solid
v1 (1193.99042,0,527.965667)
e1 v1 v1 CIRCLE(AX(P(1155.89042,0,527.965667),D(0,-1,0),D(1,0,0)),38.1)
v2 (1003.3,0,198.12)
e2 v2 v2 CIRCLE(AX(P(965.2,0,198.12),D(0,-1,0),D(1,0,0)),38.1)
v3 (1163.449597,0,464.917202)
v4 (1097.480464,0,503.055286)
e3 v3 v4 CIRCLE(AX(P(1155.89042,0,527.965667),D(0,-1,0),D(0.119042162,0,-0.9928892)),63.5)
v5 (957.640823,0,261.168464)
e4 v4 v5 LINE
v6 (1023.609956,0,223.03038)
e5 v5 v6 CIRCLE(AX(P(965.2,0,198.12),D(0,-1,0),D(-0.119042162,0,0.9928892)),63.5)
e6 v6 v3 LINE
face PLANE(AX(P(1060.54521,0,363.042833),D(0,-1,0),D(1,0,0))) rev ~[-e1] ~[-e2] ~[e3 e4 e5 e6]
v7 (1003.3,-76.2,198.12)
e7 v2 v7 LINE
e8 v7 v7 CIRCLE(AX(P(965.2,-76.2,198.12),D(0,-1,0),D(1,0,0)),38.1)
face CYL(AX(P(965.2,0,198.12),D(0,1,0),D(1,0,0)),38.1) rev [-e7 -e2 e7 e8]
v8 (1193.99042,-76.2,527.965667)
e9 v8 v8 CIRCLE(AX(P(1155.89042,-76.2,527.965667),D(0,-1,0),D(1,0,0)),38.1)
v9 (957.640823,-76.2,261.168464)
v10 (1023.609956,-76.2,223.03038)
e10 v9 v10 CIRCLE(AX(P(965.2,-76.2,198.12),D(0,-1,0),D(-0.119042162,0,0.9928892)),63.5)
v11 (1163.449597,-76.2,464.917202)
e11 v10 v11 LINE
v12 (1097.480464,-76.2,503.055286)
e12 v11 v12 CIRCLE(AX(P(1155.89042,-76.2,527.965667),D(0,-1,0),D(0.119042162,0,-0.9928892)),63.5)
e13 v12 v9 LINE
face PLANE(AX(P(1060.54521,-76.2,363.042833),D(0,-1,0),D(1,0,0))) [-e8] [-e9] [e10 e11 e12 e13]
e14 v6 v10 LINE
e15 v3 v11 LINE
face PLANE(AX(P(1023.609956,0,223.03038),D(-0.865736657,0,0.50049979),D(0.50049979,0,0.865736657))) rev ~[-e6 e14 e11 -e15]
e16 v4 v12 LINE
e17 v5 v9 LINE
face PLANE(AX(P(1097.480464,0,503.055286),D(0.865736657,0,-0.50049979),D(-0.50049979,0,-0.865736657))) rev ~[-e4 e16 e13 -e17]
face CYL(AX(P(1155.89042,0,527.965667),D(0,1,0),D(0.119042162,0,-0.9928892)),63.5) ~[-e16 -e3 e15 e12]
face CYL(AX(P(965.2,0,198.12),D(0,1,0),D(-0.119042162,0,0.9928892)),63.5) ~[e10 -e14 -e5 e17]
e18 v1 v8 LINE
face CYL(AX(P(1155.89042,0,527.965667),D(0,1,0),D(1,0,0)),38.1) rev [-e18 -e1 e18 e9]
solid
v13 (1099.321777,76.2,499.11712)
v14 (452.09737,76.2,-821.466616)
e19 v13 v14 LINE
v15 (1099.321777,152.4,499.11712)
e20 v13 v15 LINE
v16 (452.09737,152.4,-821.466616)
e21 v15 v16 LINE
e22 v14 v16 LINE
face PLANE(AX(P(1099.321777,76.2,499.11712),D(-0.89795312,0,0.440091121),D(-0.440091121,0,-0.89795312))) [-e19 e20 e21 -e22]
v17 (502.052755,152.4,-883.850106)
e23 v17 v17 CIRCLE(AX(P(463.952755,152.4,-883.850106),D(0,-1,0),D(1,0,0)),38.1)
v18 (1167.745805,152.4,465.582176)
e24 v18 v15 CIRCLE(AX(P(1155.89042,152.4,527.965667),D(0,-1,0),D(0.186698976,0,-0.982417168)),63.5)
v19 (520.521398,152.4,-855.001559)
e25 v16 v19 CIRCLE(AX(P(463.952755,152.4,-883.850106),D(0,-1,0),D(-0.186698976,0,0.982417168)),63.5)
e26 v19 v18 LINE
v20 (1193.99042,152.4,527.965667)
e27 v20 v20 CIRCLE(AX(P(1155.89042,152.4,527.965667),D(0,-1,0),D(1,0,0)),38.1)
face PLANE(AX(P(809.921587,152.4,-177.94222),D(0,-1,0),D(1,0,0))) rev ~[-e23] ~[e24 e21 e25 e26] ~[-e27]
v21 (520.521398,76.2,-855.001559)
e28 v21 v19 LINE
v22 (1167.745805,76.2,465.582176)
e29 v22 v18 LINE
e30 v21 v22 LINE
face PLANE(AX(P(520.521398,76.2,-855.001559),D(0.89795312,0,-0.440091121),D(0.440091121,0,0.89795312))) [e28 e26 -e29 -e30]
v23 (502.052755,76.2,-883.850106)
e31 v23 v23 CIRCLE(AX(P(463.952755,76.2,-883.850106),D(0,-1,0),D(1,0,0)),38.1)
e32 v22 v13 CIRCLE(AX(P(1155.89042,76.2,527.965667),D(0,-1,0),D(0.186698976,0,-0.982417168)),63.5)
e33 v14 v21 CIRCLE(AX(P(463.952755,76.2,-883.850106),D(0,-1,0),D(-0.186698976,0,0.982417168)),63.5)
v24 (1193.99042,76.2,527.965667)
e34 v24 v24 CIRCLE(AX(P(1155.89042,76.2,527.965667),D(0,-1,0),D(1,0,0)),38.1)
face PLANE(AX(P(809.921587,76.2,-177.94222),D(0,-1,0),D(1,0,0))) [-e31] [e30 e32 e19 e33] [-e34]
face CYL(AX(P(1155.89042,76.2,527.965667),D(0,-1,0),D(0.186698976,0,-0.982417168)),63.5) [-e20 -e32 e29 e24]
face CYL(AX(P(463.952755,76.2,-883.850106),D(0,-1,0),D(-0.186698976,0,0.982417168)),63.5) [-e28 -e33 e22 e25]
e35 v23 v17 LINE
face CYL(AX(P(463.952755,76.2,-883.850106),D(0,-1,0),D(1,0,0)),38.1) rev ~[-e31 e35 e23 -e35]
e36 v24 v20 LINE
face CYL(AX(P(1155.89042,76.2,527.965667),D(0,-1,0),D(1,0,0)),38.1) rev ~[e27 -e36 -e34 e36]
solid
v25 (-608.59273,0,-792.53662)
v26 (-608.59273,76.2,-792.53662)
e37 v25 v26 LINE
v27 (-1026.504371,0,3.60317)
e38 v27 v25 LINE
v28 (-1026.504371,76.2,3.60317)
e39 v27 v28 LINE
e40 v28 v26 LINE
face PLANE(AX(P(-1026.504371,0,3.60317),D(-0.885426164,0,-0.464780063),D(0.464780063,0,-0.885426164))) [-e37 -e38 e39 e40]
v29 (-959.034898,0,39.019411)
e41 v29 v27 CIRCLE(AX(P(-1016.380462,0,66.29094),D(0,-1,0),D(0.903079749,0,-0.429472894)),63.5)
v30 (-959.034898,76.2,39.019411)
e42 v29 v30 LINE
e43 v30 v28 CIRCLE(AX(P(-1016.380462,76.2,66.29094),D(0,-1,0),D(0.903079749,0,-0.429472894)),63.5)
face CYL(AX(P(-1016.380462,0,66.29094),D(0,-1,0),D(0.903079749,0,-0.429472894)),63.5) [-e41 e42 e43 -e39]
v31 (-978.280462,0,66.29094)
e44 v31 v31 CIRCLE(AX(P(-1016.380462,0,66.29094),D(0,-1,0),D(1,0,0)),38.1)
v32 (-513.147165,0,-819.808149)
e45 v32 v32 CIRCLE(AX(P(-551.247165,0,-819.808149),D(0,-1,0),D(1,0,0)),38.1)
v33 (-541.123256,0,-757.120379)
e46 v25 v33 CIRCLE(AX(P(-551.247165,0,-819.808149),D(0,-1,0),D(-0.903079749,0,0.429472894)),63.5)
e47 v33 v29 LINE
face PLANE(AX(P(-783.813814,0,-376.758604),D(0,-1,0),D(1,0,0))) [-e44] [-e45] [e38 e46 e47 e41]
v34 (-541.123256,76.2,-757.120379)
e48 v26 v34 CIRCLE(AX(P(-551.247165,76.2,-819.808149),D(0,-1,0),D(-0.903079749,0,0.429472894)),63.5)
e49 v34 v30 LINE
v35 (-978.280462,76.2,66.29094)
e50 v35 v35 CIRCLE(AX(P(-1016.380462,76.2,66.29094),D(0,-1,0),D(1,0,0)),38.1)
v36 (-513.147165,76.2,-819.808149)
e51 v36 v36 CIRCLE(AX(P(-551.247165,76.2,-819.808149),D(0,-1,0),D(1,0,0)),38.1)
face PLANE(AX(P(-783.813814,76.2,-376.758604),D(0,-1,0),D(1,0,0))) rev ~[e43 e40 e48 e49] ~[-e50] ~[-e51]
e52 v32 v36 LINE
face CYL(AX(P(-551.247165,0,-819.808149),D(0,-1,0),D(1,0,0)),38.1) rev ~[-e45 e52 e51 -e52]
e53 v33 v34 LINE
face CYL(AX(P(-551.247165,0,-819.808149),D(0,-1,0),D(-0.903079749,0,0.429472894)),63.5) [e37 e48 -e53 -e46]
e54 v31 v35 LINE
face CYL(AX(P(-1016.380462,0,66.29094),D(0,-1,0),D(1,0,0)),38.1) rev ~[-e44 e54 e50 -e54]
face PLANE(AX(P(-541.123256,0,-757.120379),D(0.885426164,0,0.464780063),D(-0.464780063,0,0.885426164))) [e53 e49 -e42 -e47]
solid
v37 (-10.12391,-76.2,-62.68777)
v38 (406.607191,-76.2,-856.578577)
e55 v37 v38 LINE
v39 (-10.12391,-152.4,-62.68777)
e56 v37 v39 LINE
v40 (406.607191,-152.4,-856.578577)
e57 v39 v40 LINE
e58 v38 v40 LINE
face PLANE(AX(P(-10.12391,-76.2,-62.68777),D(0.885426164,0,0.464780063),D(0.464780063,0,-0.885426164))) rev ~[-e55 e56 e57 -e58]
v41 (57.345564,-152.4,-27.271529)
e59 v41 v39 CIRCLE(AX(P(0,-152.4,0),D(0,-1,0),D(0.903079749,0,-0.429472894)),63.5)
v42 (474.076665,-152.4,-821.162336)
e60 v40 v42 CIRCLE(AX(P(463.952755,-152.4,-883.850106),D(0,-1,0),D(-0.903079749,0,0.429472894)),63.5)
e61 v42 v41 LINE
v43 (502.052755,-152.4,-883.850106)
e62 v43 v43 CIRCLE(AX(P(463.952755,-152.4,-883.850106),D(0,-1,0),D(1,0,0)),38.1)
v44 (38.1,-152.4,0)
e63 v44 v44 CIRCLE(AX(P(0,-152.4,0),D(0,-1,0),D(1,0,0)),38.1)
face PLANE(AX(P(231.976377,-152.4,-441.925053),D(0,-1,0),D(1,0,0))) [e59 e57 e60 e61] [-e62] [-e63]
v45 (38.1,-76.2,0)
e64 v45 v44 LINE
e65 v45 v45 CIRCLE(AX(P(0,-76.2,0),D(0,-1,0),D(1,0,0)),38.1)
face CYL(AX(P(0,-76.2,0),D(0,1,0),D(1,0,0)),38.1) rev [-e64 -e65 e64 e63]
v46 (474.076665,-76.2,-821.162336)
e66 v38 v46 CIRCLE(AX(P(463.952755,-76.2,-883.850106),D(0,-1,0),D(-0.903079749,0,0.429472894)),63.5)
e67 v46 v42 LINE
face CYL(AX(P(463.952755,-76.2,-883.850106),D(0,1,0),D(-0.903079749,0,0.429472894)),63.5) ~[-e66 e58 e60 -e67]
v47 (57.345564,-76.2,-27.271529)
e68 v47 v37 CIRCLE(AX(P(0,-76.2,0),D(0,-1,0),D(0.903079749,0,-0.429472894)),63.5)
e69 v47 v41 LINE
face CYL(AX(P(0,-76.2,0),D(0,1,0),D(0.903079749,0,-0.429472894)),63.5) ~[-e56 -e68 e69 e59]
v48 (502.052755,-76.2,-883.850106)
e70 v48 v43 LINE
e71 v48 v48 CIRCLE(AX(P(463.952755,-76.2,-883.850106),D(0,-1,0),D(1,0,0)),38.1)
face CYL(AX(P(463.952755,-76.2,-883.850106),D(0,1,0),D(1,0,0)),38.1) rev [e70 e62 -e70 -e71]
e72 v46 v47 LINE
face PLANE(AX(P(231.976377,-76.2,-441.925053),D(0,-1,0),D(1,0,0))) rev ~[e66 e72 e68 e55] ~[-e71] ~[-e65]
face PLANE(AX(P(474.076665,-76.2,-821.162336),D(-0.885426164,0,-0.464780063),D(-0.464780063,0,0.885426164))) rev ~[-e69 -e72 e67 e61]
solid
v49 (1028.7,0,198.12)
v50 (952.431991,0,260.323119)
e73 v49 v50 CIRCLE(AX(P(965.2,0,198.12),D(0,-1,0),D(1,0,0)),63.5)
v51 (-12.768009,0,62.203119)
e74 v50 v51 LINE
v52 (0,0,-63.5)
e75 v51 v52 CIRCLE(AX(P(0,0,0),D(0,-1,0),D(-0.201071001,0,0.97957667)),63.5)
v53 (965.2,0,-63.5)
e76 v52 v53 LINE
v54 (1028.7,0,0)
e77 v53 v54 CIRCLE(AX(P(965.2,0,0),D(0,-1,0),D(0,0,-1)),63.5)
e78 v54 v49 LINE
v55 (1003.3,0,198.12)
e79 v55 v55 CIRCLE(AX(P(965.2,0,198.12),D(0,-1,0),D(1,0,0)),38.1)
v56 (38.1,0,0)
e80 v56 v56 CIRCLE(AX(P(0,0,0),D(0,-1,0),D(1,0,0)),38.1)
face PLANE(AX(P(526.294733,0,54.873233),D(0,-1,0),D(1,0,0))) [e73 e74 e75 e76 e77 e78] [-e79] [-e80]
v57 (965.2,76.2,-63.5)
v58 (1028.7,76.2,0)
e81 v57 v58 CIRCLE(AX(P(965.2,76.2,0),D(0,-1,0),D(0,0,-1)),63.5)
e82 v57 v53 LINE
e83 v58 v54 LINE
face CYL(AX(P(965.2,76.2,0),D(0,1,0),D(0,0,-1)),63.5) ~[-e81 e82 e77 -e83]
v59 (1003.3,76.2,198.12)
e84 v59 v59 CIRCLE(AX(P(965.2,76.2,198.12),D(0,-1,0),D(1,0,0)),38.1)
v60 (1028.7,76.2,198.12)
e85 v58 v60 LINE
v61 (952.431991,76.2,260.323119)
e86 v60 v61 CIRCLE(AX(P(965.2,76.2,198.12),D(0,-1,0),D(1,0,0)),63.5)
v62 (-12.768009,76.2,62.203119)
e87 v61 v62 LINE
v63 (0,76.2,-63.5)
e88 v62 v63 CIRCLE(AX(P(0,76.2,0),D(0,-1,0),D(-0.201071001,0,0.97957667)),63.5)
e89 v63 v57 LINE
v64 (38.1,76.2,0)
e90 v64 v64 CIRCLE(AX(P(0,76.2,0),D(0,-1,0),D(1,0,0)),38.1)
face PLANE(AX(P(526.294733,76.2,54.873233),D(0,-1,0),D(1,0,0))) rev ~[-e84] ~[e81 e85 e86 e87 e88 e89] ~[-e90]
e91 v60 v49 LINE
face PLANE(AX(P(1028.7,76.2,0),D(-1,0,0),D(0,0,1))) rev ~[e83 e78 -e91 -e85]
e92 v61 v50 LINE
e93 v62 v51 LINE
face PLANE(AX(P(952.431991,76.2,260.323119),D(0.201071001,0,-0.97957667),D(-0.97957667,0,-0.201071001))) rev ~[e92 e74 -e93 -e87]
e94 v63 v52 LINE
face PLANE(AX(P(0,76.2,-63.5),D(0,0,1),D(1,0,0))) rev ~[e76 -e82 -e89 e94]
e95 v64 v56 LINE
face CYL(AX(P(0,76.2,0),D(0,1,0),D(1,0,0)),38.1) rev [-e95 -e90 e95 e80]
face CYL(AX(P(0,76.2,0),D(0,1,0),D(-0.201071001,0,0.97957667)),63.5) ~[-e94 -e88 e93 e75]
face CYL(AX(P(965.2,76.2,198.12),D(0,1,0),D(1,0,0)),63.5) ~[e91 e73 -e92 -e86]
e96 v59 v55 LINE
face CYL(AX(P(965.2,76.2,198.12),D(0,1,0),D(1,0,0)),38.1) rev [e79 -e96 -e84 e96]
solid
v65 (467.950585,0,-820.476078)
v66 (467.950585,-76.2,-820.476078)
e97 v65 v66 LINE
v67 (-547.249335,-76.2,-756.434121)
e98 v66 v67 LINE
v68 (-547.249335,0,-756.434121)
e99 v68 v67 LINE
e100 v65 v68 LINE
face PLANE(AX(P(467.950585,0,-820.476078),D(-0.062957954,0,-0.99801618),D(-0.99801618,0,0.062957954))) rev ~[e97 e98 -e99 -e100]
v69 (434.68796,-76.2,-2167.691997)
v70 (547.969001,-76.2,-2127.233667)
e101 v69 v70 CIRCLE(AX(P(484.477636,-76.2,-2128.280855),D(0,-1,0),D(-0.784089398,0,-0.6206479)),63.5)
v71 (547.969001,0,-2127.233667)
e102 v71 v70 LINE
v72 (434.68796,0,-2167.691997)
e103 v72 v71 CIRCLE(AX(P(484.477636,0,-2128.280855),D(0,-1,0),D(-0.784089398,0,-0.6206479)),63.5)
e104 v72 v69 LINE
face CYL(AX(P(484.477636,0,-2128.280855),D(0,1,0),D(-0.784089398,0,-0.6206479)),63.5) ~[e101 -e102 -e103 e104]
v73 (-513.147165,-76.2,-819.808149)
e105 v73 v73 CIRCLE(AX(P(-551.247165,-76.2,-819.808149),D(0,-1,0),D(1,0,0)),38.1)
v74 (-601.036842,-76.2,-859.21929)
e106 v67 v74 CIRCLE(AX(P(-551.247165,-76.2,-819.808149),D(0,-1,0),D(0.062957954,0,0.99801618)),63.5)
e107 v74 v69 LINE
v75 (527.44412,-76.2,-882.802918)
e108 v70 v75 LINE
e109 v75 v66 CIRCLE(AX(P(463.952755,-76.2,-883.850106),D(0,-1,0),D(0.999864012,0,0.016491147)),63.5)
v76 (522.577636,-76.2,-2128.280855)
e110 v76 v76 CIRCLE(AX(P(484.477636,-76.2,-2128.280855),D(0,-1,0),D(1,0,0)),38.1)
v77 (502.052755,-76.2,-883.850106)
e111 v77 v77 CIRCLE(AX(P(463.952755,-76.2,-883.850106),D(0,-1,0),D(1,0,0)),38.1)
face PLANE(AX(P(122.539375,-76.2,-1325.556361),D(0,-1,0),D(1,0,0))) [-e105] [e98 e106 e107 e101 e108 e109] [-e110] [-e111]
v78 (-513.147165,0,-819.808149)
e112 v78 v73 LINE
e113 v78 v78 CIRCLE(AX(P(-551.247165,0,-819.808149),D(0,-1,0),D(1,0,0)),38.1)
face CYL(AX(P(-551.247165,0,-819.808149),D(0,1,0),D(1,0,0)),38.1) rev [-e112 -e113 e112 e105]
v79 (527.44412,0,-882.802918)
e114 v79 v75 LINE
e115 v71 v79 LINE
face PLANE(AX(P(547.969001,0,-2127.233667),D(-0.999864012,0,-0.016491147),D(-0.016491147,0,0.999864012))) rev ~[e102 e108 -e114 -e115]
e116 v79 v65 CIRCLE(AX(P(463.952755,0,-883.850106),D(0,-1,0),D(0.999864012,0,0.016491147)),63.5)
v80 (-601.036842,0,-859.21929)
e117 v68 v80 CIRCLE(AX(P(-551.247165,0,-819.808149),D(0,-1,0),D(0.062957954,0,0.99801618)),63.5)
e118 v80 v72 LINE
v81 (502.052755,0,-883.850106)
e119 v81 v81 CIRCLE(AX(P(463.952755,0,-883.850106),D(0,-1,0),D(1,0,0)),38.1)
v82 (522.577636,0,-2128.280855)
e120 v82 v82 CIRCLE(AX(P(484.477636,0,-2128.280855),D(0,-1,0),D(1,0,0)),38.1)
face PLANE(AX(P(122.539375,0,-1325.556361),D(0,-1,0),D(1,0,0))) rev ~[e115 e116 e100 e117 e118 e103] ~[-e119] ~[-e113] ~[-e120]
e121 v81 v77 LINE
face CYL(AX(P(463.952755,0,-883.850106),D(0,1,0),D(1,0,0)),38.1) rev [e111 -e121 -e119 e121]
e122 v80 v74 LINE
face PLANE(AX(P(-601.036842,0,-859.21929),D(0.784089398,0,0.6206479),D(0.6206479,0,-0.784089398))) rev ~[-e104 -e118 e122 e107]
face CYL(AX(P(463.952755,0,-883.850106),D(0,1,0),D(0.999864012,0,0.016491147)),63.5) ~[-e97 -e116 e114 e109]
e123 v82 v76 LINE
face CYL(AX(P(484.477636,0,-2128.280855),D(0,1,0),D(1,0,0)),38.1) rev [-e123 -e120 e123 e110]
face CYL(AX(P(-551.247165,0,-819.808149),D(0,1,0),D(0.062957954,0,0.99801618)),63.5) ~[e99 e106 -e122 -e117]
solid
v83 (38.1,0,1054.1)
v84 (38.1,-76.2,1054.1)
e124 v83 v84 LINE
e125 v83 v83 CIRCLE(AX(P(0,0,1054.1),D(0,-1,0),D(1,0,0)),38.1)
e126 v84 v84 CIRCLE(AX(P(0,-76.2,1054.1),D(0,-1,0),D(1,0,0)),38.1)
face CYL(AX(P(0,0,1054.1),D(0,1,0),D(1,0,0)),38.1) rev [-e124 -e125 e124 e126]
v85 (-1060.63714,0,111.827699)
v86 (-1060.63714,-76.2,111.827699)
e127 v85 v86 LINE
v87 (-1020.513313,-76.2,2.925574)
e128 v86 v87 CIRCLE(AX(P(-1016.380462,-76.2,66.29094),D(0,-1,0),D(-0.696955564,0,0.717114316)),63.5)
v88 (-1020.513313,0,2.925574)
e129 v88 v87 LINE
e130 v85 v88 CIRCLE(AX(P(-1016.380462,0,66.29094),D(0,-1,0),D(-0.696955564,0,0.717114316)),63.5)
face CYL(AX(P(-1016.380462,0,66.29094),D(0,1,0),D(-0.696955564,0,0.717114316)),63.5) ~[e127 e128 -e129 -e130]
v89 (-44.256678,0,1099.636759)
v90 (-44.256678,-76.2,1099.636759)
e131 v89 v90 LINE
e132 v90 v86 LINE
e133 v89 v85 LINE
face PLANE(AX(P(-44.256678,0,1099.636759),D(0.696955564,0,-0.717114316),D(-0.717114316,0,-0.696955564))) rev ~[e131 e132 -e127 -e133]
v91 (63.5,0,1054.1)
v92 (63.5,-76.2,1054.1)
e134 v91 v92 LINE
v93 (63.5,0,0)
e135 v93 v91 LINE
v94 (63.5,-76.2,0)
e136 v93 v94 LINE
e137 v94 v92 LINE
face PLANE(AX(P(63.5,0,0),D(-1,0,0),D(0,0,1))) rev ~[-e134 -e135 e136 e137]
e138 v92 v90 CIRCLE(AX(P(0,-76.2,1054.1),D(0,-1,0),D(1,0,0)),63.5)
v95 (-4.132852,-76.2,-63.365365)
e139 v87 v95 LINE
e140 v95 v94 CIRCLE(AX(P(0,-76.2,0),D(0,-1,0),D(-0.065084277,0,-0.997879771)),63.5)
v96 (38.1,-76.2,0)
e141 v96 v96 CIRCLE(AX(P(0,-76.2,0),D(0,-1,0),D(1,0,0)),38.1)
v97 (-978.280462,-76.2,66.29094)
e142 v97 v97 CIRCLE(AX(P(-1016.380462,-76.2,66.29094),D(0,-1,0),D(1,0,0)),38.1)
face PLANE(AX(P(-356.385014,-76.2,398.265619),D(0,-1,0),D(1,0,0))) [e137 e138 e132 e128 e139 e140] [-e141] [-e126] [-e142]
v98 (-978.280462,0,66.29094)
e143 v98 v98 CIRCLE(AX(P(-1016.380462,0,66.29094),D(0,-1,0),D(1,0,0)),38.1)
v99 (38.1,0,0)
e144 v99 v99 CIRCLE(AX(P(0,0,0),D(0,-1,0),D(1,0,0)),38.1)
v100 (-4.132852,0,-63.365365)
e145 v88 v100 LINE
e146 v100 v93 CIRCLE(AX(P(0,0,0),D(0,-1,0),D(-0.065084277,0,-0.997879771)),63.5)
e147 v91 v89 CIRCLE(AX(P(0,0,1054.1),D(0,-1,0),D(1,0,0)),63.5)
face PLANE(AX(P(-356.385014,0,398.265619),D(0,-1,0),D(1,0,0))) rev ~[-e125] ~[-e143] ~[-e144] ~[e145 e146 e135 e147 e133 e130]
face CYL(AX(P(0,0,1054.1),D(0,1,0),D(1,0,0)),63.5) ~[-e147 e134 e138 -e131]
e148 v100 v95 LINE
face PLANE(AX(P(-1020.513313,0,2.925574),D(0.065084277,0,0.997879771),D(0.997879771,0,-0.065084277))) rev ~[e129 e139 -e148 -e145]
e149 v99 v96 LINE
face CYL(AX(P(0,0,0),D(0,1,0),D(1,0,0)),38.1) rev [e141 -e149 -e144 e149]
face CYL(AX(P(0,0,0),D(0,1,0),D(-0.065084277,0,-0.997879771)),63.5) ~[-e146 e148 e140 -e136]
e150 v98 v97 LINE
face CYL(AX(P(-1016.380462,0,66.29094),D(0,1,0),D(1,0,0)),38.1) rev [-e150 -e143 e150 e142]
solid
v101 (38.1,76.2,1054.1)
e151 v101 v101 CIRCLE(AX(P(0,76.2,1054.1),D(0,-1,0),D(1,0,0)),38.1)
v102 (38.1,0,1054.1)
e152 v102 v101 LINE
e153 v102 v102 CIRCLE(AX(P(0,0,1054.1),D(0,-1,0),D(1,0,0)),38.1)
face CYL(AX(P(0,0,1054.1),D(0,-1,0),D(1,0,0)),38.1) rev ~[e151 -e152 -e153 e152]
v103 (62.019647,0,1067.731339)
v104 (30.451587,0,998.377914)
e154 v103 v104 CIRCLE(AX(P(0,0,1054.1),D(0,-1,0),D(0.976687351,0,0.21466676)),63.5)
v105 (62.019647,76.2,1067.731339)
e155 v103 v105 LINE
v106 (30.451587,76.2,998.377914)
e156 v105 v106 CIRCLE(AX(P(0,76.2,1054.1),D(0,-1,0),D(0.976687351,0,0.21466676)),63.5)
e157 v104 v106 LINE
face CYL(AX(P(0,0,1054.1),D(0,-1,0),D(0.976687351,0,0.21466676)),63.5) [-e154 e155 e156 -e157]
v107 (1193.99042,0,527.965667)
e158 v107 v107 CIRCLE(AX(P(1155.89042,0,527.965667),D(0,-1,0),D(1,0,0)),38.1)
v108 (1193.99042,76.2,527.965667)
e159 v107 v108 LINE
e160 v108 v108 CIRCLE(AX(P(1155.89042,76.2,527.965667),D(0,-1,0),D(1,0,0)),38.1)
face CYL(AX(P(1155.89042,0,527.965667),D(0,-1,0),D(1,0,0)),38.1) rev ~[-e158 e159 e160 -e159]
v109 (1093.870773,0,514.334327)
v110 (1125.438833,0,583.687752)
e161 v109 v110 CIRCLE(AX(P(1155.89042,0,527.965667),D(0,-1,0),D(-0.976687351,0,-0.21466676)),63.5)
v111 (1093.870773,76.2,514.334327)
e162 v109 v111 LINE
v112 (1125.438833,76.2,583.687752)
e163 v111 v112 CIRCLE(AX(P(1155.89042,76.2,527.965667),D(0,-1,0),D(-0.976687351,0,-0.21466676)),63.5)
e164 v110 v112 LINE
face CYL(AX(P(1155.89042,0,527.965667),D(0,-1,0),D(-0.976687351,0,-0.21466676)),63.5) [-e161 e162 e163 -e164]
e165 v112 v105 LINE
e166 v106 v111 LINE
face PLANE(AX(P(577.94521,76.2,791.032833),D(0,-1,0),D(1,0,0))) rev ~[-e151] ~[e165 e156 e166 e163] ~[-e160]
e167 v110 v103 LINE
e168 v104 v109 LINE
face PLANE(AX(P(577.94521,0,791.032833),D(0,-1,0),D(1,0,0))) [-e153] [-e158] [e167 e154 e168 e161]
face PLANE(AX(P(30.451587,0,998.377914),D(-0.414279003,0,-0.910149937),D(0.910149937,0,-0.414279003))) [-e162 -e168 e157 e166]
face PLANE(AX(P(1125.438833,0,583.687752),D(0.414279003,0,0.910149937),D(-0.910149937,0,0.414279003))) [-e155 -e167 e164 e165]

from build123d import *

# Parameters (mm, degrees)
F4_R      = 38.1
F5_DEPTH  = 76.2
F7_R      = 38.1
F8_DEPTH  = 76.2
F6_R      = 38.1
F9_DEPTH  = 76.2
F10_R     = 38.1
F11_DEPTH = 76.2
F13_R     = 38.1
F16_DEPTH = 76.2
F15_R     = 38.1
F17_DEPTH = 76.2
F14_R     = 38.1
F18_DEPTH = 76.2
F12_R     = 38.1
F19_DEPTH = 76.2


# Not quite as in the source:
# - a variable given as a bare number and used for a length is read in inches; the dataset says mm whatever the document's units were


with BuildPart() as f5:
    # F4 (on Front) → F5 (new body)
    with BuildSketch(Plane.XZ):
        with BuildLine():
            Line((-44.2566783262, 1099.6367590363), (-1060.6371400165, 111.8276987953))
            ThreePointArc((-1060.6371400165, 111.8276987953), (-1075.9648961572, 44.3376901303), (-1020.5133132963, 2.925574317))
            Line((-1020.5133132963, 2.925574317), (-4.1328516059, -63.365365442))
            ThreePointArc((-4.1328516059, -63.365365442), (43.4155152165, -46.3394328676), (63.5, 0))
            Line((63.5, 0), (63.5, 1054.1))
            ThreePointArc((63.5, 1054.1), (24.7179178561, 1112.591662114), (-44.2566783262, 1099.6367590363))
        make_face()
        with Locations((-1016.3804616903, 66.290939759)):
            Circle(F4_R, mode=Mode.SUBTRACT)
        Circle(F4_R, mode=Mode.SUBTRACT)
        with Locations((0, 1054.1)):
            Circle(F4_R, mode=Mode.SUBTRACT)
    extrude(amount=F5_DEPTH)


with BuildPart() as f8:
    # F7 (on offset) → F8 (new body)
    with BuildSketch(Plane.XZ.offset(-76.2)):
        with BuildLine():
            Line((952.4319914548, 260.3231185536), (-12.7680085452, 62.2031185536))
            ThreePointArc((-12.7680085452, 62.2031185536), (-63.1749476777, -6.4168517144), (0, -63.5))
            Line((0, -63.5), (965.2, -63.5))
            ThreePointArc((965.2, -63.5), (1010.1012806053, -44.9012806053), (1028.7, 0))
            Line((1028.7, 0), (1028.7, 198.12))
            ThreePointArc((1028.7, 198.12), (1005.3340345429, 247.3288332651), (952.4319914548, 260.3231185536))
        make_face()
        Circle(F7_R, mode=Mode.SUBTRACT)
        with Locations((965.2, 198.12)):
            Circle(F7_R, mode=Mode.SUBTRACT)
    extrude(amount=F8_DEPTH)


with BuildPart() as f9:
    # F6 (on Front) → F9 (new body)
    with BuildSketch(Plane.XZ):
        with BuildLine():
            Line((-541.1232558193, -757.1203790043), (-959.0348976054, 39.0194110198))
            ThreePointArc((-959.0348976054, 39.0194110198), (-1045.8939957148, 122.5155012014), (-1026.5043713362, 3.6031701905))
            Line((-1026.5043713362, 3.6031701905), (-608.5927295501, -792.5366198337))
            ThreePointArc((-608.5927295501, -792.5366198337), (-521.7336314407, -876.0327100153), (-541.1232558193, -757.1203790043))
        make_face()
        with Locations((-551.2471654652, -819.8081485729)):
            Circle(F6_R, mode=Mode.SUBTRACT)
        with Locations((-1016.3804616903, 66.290939759)):
            Circle(F6_R, mode=Mode.SUBTRACT)
    extrude(amount=-F9_DEPTH)


with BuildPart() as f11:
    # F10 (on Front) → F11 (new body)
    with BuildSketch(Plane.XZ):
        with BuildLine():
            Line((1125.4388332322, 583.6877524417), (62.0196468061, 1067.7313392609))
            ThreePointArc((62.0196468061, 1067.7313392609), (-57.7945210014, 1080.406716675), (30.4515867962, 998.3779140592))
            Line((30.4515867962, 998.3779140592), (1093.8707732223, 514.33432724))
            ThreePointArc((1093.8707732223, 514.33432724), (1213.6849410298, 501.6589498259), (1125.4388332322, 583.6877524417))
        make_face()
        with Locations((1155.8904200284, 527.9656665009)):
            Circle(F10_R, mode=Mode.SUBTRACT)
        with Locations((0, 1054.1)):
            Circle(F10_R, mode=Mode.SUBTRACT)
    extrude(amount=-F11_DEPTH)


with BuildPart() as f16:
    # F13 (on Front) → F16 (new body)
    with BuildSketch(Plane.XZ):
        with BuildLine():
            Line((-601.0368422679, -859.2192901941), (434.6879595358, -2167.6919965692))
            ThreePointArc((434.6879595358, -2167.6919965692), (505.8353789309, -2188.0813301248), (547.9690010872, -2127.2336671178))
            Line((547.9690010872, -2127.2336671178), (527.4441196129, -882.8029180439))
            ThreePointArc((527.4441196129, -882.8029180439), (509.88593011, -840.0049988287), (467.9505849255, -820.4760784277))
            Line((467.9505849255, -820.4760784277), (-547.2493354038, -756.4341211263))
            ThreePointArc((-547.2493354038, -756.4341211263), (-607.5092401875, -790.3661896039), (-601.0368422679, -859.2192901941))
        make_face()
        with Locations((484.4776363385, -2128.2808549481)):
            Circle(F13_R, mode=Mode.SUBTRACT)
        with Locations((-551.2471654652, -819.8081485729)):
            Circle(F13_R, mode=Mode.SUBTRACT)
        with Locations((463.9527548642, -883.8501058743)):
            Circle(F13_R, mode=Mode.SUBTRACT)
    extrude(amount=F16_DEPTH)


with BuildPart() as f17:
    # F15 (on offset) → F17 (new body)
    with BuildSketch(Plane.XZ.offset(-76.2)):
        with BuildLine():
            Line((520.5213976573, -855.0015590729), (1167.7458049756, 465.5821763151))
            ThreePointArc((1167.7458049756, 465.5821763151), (1183.836206182, 584.9856896178), (1099.3217772353, 499.1171196995))
            Line((1099.3217772353, 499.1171196995), (452.0973699169, -821.4666156885))
            ThreePointArc((452.0973699169, -821.4666156885), (436.0069687106, -940.8701289912), (520.5213976573, -855.0015590729))
        make_face()
        with Locations((463.9527548642, -883.8501058743)):
            Circle(F15_R, mode=Mode.SUBTRACT)
        with Locations((1155.8904200284, 527.9656665009)):
            Circle(F15_R, mode=Mode.SUBTRACT)
    extrude(amount=-F17_DEPTH)


with BuildPart() as f18:
    # F14 (on offset) → F18 (new body)
    with BuildSketch(Plane.XZ.offset(76.2)):
        with BuildLine():
            Line((474.0766645101, -821.1623363057), (57.345564085, -27.2715287392))
            ThreePointArc((57.345564085, -27.2715287392), (-29.5135340244, 56.2245614424), (-10.1239096459, -62.6877695686))
            Line((-10.1239096459, -62.6877695686), (406.6071907792, -856.578577135))
            ThreePointArc((406.6071907792, -856.578577135), (493.4662888886, -940.0746673166), (474.0766645101, -821.1623363057))
        make_face()
        with Locations((463.9527548642, -883.8501058743)):
            Circle(F14_R, mode=Mode.SUBTRACT)
        Circle(F14_R, mode=Mode.SUBTRACT)
    extrude(amount=F18_DEPTH)


with BuildPart() as f19:
    # F12 (on Front) → F19 (new body)
    with BuildSketch(Plane.XZ):
        with BuildLine():
            ThreePointArc((957.640822687, 261.168464203), (933.4182633286, 143.1457222499), (1023.6099559872, 223.0303801973))
            Line((1023.6099559872, 223.0303801973), (1163.4495973414, 464.9172022979))
            ThreePointArc((1163.4495973414, 464.9172022979), (1187.6721566998, 582.939944251), (1097.4804640412, 503.0552863036))
            Line((1097.4804640412, 503.0552863036), (957.640822687, 261.168464203))
        make_face()
        with Locations((965.2, 198.12)):
            Circle(F12_R, mode=Mode.SUBTRACT)
        with Locations((1155.8904200284, 527.9656665009)):
            Circle(F12_R, mode=Mode.SUBTRACT)
    extrude(amount=F19_DEPTH)


solid = Compound([f5.part, f8.part, f9.part, f11.part, f16.part, f17.part, f18.part, f19.part])
